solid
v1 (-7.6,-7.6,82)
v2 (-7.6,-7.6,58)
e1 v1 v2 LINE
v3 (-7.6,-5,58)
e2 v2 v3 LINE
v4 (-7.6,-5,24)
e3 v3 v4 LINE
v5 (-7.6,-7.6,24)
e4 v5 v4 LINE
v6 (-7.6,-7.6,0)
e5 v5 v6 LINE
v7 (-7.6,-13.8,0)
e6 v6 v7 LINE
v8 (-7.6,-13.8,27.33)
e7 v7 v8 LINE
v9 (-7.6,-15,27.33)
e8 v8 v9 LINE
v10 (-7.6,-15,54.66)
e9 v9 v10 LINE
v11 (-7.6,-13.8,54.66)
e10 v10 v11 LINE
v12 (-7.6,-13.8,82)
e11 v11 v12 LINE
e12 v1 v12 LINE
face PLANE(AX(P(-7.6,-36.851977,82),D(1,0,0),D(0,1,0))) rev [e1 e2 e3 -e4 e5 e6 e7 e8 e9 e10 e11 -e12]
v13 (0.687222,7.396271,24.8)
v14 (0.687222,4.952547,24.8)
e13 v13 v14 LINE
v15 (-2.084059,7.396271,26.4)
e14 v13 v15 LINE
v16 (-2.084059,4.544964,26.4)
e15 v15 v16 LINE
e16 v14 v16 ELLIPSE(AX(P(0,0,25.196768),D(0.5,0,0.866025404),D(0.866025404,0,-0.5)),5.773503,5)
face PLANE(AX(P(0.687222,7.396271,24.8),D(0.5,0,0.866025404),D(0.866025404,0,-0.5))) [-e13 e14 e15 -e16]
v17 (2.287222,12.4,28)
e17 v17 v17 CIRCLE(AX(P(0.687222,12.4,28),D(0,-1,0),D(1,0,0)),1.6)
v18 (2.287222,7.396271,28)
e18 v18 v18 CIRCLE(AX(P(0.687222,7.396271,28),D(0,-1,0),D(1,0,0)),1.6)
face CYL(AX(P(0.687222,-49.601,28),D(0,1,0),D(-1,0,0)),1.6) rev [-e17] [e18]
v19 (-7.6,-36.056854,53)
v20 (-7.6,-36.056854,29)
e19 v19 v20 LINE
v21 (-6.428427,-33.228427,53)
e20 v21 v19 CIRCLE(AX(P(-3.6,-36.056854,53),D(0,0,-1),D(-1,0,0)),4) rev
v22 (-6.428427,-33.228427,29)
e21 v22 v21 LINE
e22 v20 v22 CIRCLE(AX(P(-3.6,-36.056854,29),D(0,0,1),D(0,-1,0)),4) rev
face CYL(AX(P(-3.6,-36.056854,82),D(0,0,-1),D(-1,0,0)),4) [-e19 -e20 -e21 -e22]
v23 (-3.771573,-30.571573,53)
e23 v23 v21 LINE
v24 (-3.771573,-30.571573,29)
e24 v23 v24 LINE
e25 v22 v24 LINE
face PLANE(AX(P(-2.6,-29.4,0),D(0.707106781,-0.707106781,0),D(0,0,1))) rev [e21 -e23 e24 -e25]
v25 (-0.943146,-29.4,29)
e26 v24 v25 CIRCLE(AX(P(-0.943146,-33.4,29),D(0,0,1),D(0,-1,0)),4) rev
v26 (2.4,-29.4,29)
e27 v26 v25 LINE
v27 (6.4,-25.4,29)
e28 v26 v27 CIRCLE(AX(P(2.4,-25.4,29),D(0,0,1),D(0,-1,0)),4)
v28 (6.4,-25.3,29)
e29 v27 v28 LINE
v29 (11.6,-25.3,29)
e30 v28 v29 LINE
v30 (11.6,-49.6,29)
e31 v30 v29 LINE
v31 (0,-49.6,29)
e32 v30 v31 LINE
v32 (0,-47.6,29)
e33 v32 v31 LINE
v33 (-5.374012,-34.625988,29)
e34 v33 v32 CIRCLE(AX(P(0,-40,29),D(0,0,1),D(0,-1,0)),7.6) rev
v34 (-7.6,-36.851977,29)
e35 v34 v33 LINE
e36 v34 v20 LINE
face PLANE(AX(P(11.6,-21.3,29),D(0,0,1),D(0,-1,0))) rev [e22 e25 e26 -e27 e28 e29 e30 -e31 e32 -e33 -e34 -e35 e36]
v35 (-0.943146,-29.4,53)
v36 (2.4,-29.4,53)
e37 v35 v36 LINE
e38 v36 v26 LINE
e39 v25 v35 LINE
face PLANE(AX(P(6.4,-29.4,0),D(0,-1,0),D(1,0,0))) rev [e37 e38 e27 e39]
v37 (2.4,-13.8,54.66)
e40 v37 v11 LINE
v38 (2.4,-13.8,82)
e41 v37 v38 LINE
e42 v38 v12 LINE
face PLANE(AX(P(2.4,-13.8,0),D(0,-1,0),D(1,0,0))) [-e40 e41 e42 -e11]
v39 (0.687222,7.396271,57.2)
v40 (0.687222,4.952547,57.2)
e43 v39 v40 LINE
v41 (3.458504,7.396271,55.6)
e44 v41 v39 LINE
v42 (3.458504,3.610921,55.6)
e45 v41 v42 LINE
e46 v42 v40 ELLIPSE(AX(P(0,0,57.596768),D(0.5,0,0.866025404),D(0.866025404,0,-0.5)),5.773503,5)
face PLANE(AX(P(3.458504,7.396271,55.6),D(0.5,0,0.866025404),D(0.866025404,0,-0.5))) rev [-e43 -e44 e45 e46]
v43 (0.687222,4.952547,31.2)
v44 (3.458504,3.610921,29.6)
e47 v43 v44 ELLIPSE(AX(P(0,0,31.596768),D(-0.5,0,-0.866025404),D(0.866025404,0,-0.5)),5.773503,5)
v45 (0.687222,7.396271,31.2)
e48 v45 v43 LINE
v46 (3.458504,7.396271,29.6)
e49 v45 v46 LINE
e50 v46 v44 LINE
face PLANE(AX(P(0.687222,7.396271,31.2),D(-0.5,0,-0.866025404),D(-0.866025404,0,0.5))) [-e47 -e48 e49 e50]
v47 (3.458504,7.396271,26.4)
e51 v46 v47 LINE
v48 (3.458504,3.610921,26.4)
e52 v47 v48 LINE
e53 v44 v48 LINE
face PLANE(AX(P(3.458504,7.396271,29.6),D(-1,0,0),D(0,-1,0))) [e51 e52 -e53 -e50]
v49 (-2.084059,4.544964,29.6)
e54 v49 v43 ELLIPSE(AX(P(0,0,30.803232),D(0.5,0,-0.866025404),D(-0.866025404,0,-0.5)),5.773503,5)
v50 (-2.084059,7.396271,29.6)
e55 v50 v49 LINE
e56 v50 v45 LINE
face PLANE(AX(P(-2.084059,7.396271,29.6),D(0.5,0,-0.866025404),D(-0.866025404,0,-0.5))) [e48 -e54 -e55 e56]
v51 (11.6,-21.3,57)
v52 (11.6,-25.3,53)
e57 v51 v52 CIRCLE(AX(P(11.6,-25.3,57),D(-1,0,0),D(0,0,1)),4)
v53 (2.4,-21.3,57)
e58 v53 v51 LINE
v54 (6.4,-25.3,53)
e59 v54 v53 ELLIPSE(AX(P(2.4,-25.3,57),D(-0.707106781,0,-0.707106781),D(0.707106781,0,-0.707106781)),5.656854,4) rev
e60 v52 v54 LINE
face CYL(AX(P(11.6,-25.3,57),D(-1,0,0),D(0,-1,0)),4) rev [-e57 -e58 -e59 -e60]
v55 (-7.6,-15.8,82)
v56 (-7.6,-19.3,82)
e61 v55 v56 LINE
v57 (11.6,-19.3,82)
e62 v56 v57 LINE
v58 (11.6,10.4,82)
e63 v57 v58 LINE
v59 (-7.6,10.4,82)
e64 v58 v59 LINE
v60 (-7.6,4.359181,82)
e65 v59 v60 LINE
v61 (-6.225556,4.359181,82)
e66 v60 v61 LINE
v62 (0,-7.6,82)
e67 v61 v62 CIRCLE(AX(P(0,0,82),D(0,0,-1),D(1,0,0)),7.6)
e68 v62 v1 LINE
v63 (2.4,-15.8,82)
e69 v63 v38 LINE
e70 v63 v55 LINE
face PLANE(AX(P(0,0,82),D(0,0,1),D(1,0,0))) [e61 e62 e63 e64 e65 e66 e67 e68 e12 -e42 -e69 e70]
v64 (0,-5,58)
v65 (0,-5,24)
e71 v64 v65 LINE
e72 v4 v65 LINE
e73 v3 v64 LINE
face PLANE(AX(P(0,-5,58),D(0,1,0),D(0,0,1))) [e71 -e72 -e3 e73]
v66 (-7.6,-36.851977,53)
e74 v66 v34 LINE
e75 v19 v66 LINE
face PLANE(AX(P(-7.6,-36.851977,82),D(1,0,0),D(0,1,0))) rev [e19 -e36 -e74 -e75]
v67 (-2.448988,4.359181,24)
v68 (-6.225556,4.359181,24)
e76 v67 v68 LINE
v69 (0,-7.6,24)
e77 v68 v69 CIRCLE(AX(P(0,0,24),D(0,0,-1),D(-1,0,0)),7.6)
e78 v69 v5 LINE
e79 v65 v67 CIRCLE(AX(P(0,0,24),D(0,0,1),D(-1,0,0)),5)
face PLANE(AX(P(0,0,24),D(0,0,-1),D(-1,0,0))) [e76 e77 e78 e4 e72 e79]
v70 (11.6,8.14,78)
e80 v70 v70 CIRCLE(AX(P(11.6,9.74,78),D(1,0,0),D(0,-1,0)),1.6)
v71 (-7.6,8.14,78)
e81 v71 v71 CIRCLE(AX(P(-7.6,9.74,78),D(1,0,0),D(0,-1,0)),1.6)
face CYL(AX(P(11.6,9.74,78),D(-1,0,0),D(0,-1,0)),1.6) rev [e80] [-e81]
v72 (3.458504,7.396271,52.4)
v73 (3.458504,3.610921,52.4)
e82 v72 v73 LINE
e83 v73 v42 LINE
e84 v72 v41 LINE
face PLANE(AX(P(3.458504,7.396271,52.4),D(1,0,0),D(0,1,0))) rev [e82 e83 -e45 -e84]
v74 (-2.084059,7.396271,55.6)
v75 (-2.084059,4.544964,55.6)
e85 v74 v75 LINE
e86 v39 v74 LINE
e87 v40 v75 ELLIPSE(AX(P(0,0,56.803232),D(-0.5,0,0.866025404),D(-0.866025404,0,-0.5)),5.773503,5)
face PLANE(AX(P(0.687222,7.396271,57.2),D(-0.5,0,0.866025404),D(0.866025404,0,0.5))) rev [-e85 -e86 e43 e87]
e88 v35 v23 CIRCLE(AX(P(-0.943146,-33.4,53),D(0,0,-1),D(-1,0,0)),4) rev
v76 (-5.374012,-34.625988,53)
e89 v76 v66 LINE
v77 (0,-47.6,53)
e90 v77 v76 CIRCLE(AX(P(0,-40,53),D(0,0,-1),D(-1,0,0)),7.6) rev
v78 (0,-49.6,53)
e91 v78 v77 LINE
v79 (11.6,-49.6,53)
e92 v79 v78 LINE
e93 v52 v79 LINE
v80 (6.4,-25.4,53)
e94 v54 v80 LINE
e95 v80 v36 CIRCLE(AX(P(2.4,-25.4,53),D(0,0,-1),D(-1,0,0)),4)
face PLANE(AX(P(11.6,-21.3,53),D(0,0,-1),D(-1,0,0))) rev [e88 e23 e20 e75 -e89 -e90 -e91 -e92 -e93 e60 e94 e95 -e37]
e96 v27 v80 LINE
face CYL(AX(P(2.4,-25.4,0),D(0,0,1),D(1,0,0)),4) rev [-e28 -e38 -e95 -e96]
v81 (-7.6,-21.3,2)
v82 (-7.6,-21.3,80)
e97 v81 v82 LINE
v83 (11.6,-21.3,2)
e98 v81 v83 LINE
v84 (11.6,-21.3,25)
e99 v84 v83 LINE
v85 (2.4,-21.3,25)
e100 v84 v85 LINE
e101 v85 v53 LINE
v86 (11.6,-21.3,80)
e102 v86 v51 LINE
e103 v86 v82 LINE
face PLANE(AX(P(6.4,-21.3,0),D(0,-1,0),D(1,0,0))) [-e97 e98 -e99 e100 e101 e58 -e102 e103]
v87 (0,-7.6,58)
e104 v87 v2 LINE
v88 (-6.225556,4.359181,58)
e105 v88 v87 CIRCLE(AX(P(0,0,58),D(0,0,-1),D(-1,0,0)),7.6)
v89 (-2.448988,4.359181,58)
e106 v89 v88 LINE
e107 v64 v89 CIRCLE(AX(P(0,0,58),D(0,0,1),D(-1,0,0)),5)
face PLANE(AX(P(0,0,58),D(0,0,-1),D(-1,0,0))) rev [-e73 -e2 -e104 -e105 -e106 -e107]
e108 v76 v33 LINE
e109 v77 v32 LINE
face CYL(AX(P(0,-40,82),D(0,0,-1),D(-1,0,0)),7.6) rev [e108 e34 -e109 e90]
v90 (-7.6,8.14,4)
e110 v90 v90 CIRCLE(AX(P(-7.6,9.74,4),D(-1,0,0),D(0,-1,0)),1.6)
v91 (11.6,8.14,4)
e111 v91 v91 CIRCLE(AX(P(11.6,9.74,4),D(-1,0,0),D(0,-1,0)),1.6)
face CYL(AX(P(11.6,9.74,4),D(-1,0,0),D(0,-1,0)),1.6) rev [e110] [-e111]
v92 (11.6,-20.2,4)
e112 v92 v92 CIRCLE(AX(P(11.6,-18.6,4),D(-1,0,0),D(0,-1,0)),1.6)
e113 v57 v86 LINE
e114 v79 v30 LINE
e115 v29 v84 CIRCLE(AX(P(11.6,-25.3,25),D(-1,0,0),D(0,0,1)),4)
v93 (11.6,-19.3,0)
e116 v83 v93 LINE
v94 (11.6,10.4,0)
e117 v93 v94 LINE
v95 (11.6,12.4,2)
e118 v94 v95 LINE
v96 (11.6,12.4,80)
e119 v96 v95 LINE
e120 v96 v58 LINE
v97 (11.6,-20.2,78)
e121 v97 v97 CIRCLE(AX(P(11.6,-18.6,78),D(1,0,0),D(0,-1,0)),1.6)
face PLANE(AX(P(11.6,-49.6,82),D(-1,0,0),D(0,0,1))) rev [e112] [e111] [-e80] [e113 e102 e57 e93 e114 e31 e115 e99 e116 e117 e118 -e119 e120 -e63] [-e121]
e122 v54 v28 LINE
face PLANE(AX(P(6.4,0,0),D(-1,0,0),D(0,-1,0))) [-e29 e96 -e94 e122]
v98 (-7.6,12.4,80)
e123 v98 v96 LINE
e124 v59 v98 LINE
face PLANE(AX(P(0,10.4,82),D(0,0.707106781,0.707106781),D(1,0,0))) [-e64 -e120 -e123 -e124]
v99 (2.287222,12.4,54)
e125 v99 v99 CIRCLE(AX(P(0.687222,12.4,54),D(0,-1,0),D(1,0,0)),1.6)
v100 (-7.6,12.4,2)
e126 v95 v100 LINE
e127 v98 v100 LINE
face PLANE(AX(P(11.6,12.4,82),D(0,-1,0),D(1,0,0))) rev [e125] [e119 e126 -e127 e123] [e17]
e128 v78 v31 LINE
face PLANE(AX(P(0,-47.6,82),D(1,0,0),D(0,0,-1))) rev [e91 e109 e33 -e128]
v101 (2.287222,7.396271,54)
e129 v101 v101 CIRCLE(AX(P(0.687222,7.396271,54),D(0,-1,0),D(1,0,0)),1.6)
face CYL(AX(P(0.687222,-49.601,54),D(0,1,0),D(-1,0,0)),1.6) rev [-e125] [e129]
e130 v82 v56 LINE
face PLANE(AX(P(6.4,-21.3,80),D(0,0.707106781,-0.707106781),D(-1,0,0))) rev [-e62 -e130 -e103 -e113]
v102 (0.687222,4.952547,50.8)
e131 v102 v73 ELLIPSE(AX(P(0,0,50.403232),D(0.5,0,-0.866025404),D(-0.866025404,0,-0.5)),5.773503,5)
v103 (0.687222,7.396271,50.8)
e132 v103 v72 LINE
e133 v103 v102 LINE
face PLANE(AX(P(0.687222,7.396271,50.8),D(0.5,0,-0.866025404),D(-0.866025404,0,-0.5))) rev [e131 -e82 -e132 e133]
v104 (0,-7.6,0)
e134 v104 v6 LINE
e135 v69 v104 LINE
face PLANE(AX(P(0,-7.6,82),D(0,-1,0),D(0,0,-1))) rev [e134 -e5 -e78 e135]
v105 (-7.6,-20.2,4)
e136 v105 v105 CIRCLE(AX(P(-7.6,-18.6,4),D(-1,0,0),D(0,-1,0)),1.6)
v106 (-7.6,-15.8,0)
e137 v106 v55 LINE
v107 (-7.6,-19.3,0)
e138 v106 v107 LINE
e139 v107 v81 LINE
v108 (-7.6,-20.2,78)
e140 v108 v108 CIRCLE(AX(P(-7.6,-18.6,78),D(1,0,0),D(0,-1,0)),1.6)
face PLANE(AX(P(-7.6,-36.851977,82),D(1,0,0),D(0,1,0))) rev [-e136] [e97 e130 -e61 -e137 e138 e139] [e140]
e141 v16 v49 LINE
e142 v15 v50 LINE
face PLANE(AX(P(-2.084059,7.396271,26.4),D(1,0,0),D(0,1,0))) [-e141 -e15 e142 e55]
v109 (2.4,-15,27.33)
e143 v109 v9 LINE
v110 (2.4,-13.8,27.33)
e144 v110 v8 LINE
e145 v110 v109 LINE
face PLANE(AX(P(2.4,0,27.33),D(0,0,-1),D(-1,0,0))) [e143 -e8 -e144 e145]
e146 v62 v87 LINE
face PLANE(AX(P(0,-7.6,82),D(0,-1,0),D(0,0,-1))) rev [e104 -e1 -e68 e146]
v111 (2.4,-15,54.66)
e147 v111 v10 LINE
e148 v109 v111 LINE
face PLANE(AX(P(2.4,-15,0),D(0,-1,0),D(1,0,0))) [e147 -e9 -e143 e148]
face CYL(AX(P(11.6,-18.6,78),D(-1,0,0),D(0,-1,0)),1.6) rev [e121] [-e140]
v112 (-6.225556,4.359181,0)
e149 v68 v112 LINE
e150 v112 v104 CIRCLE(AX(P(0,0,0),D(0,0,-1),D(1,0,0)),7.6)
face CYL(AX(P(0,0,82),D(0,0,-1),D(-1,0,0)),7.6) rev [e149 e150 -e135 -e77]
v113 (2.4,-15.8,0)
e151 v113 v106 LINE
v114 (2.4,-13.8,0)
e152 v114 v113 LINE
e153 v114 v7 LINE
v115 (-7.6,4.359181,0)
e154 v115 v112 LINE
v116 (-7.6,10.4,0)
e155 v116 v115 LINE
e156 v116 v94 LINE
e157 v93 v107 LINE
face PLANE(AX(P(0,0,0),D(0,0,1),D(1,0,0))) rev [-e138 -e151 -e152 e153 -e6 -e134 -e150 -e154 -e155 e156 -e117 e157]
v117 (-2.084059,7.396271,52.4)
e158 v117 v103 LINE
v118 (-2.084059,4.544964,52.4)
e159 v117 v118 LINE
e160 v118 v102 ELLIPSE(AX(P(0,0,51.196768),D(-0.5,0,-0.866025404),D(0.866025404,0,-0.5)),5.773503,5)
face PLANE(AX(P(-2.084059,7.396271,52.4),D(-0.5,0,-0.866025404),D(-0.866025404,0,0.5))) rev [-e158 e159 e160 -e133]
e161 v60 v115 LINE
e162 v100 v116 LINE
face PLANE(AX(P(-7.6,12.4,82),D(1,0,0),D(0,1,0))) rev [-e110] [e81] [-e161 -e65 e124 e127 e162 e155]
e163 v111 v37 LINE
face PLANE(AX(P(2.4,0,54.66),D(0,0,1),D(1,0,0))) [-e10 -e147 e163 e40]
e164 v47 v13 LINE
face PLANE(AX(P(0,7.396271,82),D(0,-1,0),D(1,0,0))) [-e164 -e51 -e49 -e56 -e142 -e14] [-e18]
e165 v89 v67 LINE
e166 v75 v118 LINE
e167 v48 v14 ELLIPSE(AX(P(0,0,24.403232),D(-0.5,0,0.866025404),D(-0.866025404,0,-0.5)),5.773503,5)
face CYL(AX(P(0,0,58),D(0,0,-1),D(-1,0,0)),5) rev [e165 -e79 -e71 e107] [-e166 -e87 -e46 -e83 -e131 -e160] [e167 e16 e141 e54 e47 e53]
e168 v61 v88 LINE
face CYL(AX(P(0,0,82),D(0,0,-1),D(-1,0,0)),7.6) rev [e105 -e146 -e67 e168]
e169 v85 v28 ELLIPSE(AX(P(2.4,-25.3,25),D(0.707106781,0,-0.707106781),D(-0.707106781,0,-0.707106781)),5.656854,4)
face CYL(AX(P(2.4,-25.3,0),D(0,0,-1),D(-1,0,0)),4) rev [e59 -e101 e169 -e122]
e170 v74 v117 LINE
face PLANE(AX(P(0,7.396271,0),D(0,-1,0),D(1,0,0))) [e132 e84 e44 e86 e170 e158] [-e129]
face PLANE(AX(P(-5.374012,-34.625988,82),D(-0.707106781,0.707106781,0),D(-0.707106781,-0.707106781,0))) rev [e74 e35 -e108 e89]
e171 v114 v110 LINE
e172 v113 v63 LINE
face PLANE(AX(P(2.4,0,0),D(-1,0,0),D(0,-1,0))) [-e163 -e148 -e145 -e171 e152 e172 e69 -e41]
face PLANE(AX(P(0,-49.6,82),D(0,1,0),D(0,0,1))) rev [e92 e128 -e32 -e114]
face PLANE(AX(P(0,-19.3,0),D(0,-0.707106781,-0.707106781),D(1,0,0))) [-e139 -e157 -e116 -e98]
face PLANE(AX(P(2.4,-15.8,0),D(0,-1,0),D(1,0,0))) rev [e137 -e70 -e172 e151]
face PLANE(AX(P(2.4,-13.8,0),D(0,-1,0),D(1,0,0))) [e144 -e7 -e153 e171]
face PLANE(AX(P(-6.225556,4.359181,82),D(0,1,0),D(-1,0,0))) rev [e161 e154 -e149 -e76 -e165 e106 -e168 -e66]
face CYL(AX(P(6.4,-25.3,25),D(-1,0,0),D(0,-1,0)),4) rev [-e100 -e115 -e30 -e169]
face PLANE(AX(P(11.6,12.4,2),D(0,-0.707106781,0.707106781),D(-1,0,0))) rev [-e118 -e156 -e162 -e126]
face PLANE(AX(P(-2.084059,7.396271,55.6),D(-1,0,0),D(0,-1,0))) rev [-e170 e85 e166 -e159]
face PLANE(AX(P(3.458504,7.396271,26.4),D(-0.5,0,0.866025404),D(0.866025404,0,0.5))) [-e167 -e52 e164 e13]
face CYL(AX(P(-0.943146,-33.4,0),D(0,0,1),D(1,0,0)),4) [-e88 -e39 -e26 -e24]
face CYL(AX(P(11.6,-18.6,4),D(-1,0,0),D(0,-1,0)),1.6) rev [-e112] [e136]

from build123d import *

# Parameters (mm, degrees)
BOSS_EXTRUDE1_DEPTH      = 82
BOSS_EXTRUDE2_DEPTH      = 17
BOSS_EXTRUDE2_DEPTH_BACK = 17
CUT_EXTRUDE1_DEPTH       = 10
SKETCH6_R                = 1.6
CUT_EXTRUDE2_DEPTH       = 98.738426425
CUT_EXTRUDE3_DEPTH       = 14
CHAMFER1_SIZE            = 2
SKETCH9_W                = 29
SKETCH9_H                = 28.3
CUT_EXTRUDE4_DEPTH       = 98.738426425
FILLET1_R                = 4
FILLET2_R                = 4
CHAMFER2_SIZE            = 2
CHAMFER3_SIZE            = 5
FILLET3_R                = 4
CUT_EXTRUDE5_REACH       = 109.79
CUT_EXTRUDE5_START       = -10.003729205
SKETCH11_R               = 1.6
CUT_EXTRUDE6_DEPTH       = 5


with BuildPart() as part:
    # Sketch1 → Boss-Extrude1 (new body)
    with BuildSketch(Plane.XY):
        with BuildLine():
            Line((0, -47.6), (0, -49.6))
            Line((0, -49.6), (11.6, -49.6))
            Line((11.6, -49.6), (11.6, 12.4))
            Line((11.6, 12.4), (-7.6, 12.4))
            Line((-7.6, 12.4), (-7.6, 4.359180916))
            Line((-7.6, 4.359180916), (-6.225555537, 4.359180916))
            ThreePointArc((-6.225555537, 4.359180916), (6.741282332, 3.509289461), (0, -7.6))
            Line((0, -7.6), (-7.6, -7.6))
            Line((-7.6, -7.6), (-7.6, -9.6))
            Line((-7.6, -9.6), (-7.6, -18.625988463))
            Line((-7.6, -18.625988463), (-7.6, -36.851976926))
            Line((-7.6, -36.851976926), (-5.374011537, -34.625988463))
            ThreePointArc((-5.374011537, -34.625988463), (7.021484447, -37.091605914), (0, -47.6))
        make_face()
    extrude(amount=BOSS_EXTRUDE1_DEPTH)

    # Sketch2 → Boss-Extrude2 (add, two sides: drawn at the far end of the back side and taken through both)
    with BuildSketch(Plane(origin=(0, 0, 41), x_dir=(-1, 0, 0), z_dir=(0, 0, -1)).offset(-BOSS_EXTRUDE2_DEPTH_BACK)):
        with BuildLine():
            Line((0, -7.6), (7.6, -7.6))
            Line((7.6, -7.6), (7.6, -5))
            Line((7.6, -5), (0, -5))
            ThreePointArc((0, -5), (-4.837142988, 1.265720233), (2.448987901, 4.359180916))
            Line((2.448987901, 4.359180916), (6.225555537, 4.359180916))
            ThreePointArc((6.225555537, 4.359180916), (-6.741282332, 3.509289461), (0, -7.6))
        make_face()
    extrude(amount=BOSS_EXTRUDE2_DEPTH + BOSS_EXTRUDE2_DEPTH_BACK)

    # Sketch4 → Cut-Extrude1 (cut)
    with BuildSketch(Plane.ZY.offset(7.6)):
        Polygon((82, -13.8), (54.66, -13.8), (54.66, -15), (27.33, -15), (27.33, -13.8), (0, -13.8), (0, -15.8), (82, -15.8), align=None)
    extrude(amount=-CUT_EXTRUDE1_DEPTH, mode=Mode.SUBTRACT)

    # Sketch6 → Cut-Extrude2 (cut, through all)
    with BuildSketch(Plane.ZY.offset(7.6)):
        with Locations((4, 9.74)):
            Circle(SKETCH6_R)
        with Locations((4, -18.6)):
            Circle(SKETCH6_R)
    cut_extrude2 = extrude(amount=-CUT_EXTRUDE2_DEPTH, mode=Mode.SUBTRACT)

    # Mirror1: Cut-Extrude2 across plane
    add(cut_extrude2.mirror(Plane(origin=(0, 0, 41), x_dir=(1, 0, 0), z_dir=(0, 0, -1))), mode=Mode.SUBTRACT)

    # Sketch7 → Cut-Extrude3 (cut)
    with BuildSketch(Plane.ZY.offset(7.6)):
        Polygon((0, -29.4), (82, -29.4), (82, -21.3), (74, -21.3), (8, -21.3), (0, -21.3), align=None)
    extrude(amount=-CUT_EXTRUDE3_DEPTH, mode=Mode.SUBTRACT)

    # Chamfer1
    chamfer1_edges = [part.edges().sort_by_distance(p)[0] for p in [
        (2, 12.4, 82),
        (2, 12.4, 0),
    ]]
    chamfer(chamfer1_edges, length=CHAMFER1_SIZE)

    # Sketch9 → Cut-Extrude4 (cut, through all)
    with BuildSketch(Plane.ZY.offset(7.6)):
        with Locations((67.5, -35.45)):
            Rectangle(SKETCH9_W, SKETCH9_H)
        with Locations((14.5, -35.45)):
            Rectangle(SKETCH9_W, SKETCH9_H)
    extrude(amount=-CUT_EXTRUDE4_DEPTH, mode=Mode.SUBTRACT)

    # Fillet1
    fillet1_edges = [part.edges().sort_by_distance(p)[0] for p in [
        (6.4, -29.4, 41),
        (6.4, -21.3, 41),
    ]]
    fillet(fillet1_edges, radius=FILLET1_R)

    # Fillet2
    fillet2_edges = [part.edges().sort_by_distance(p)[0] for p in [
        (7, -21.3, 53),
        (7, -21.3, 29),
    ]]
    fillet(fillet2_edges, radius=FILLET2_R)

    # Chamfer2
    chamfer2_edges = [part.edges().sort_by_distance(p)[0] for p in [
        (2, -21.3, 82),
        (2, -21.3, 0),
    ]]
    chamfer(chamfer2_edges, length=CHAMFER2_SIZE)

    # Chamfer3
    chamfer3_edges = [part.edges().sort_by_distance(p)[0] for p in [
        (-7.6, -29.4, 41),
    ]]
    chamfer(chamfer3_edges, length=CHAMFER3_SIZE)

    # Fillet3
    fillet3_edges = [part.edges().sort_by_distance(p)[0] for p in [
        (-7.6, -34.4, 41),
        (-2.6, -29.4, 41),
    ]]
    fillet(fillet3_edges, radius=FILLET3_R)

    # Sketch11 → Cut-Extrude5 (cut, up to next)
    with BuildSketch(Plane.XZ.offset(-2.396270795).offset(CUT_EXTRUDE5_START), mode=Mode.PRIVATE) as cut_extrude5_sk1:
        with Locations((0.687222232, 54)):
            Circle(SKETCH11_R)
    cut_extrude5_tool1 = extrude(cut_extrude5_sk1.sketch, amount=CUT_EXTRUDE5_REACH, mode=Mode.PRIVATE) & part.part
    cut_extrude5 = cut_extrude5_tool1.solids().sort_by_distance((0.687222, 12.4, 54))[0]
    add(cut_extrude5, mode=Mode.SUBTRACT)

    # Mirror2: Cut-Extrude5 across plane
    add(cut_extrude5.mirror(Plane(origin=(0, 0, 41), x_dir=(1, 0, 0), z_dir=(0, 0, -1))), mode=Mode.SUBTRACT)

    # Sketch12 → Cut-Extrude6 (cut)
    with BuildSketch(Plane.XZ.offset(-2.396270795)):
        Polygon((-2.08405906, 52.4), (0.687222232, 50.8), (3.458503524, 52.4), (3.458503524, 55.6), (0.687222232, 57.2), (-2.08405906, 55.6), align=None)
    cut_extrude6 = extrude(amount=-CUT_EXTRUDE6_DEPTH, mode=Mode.SUBTRACT)

    # Mirror3: Cut-Extrude6 across plane
    add(cut_extrude6.mirror(Plane(origin=(0, 0, 41), x_dir=(1, 0, 0), z_dir=(0, 0, -1))), mode=Mode.SUBTRACT)


solid = part.part
